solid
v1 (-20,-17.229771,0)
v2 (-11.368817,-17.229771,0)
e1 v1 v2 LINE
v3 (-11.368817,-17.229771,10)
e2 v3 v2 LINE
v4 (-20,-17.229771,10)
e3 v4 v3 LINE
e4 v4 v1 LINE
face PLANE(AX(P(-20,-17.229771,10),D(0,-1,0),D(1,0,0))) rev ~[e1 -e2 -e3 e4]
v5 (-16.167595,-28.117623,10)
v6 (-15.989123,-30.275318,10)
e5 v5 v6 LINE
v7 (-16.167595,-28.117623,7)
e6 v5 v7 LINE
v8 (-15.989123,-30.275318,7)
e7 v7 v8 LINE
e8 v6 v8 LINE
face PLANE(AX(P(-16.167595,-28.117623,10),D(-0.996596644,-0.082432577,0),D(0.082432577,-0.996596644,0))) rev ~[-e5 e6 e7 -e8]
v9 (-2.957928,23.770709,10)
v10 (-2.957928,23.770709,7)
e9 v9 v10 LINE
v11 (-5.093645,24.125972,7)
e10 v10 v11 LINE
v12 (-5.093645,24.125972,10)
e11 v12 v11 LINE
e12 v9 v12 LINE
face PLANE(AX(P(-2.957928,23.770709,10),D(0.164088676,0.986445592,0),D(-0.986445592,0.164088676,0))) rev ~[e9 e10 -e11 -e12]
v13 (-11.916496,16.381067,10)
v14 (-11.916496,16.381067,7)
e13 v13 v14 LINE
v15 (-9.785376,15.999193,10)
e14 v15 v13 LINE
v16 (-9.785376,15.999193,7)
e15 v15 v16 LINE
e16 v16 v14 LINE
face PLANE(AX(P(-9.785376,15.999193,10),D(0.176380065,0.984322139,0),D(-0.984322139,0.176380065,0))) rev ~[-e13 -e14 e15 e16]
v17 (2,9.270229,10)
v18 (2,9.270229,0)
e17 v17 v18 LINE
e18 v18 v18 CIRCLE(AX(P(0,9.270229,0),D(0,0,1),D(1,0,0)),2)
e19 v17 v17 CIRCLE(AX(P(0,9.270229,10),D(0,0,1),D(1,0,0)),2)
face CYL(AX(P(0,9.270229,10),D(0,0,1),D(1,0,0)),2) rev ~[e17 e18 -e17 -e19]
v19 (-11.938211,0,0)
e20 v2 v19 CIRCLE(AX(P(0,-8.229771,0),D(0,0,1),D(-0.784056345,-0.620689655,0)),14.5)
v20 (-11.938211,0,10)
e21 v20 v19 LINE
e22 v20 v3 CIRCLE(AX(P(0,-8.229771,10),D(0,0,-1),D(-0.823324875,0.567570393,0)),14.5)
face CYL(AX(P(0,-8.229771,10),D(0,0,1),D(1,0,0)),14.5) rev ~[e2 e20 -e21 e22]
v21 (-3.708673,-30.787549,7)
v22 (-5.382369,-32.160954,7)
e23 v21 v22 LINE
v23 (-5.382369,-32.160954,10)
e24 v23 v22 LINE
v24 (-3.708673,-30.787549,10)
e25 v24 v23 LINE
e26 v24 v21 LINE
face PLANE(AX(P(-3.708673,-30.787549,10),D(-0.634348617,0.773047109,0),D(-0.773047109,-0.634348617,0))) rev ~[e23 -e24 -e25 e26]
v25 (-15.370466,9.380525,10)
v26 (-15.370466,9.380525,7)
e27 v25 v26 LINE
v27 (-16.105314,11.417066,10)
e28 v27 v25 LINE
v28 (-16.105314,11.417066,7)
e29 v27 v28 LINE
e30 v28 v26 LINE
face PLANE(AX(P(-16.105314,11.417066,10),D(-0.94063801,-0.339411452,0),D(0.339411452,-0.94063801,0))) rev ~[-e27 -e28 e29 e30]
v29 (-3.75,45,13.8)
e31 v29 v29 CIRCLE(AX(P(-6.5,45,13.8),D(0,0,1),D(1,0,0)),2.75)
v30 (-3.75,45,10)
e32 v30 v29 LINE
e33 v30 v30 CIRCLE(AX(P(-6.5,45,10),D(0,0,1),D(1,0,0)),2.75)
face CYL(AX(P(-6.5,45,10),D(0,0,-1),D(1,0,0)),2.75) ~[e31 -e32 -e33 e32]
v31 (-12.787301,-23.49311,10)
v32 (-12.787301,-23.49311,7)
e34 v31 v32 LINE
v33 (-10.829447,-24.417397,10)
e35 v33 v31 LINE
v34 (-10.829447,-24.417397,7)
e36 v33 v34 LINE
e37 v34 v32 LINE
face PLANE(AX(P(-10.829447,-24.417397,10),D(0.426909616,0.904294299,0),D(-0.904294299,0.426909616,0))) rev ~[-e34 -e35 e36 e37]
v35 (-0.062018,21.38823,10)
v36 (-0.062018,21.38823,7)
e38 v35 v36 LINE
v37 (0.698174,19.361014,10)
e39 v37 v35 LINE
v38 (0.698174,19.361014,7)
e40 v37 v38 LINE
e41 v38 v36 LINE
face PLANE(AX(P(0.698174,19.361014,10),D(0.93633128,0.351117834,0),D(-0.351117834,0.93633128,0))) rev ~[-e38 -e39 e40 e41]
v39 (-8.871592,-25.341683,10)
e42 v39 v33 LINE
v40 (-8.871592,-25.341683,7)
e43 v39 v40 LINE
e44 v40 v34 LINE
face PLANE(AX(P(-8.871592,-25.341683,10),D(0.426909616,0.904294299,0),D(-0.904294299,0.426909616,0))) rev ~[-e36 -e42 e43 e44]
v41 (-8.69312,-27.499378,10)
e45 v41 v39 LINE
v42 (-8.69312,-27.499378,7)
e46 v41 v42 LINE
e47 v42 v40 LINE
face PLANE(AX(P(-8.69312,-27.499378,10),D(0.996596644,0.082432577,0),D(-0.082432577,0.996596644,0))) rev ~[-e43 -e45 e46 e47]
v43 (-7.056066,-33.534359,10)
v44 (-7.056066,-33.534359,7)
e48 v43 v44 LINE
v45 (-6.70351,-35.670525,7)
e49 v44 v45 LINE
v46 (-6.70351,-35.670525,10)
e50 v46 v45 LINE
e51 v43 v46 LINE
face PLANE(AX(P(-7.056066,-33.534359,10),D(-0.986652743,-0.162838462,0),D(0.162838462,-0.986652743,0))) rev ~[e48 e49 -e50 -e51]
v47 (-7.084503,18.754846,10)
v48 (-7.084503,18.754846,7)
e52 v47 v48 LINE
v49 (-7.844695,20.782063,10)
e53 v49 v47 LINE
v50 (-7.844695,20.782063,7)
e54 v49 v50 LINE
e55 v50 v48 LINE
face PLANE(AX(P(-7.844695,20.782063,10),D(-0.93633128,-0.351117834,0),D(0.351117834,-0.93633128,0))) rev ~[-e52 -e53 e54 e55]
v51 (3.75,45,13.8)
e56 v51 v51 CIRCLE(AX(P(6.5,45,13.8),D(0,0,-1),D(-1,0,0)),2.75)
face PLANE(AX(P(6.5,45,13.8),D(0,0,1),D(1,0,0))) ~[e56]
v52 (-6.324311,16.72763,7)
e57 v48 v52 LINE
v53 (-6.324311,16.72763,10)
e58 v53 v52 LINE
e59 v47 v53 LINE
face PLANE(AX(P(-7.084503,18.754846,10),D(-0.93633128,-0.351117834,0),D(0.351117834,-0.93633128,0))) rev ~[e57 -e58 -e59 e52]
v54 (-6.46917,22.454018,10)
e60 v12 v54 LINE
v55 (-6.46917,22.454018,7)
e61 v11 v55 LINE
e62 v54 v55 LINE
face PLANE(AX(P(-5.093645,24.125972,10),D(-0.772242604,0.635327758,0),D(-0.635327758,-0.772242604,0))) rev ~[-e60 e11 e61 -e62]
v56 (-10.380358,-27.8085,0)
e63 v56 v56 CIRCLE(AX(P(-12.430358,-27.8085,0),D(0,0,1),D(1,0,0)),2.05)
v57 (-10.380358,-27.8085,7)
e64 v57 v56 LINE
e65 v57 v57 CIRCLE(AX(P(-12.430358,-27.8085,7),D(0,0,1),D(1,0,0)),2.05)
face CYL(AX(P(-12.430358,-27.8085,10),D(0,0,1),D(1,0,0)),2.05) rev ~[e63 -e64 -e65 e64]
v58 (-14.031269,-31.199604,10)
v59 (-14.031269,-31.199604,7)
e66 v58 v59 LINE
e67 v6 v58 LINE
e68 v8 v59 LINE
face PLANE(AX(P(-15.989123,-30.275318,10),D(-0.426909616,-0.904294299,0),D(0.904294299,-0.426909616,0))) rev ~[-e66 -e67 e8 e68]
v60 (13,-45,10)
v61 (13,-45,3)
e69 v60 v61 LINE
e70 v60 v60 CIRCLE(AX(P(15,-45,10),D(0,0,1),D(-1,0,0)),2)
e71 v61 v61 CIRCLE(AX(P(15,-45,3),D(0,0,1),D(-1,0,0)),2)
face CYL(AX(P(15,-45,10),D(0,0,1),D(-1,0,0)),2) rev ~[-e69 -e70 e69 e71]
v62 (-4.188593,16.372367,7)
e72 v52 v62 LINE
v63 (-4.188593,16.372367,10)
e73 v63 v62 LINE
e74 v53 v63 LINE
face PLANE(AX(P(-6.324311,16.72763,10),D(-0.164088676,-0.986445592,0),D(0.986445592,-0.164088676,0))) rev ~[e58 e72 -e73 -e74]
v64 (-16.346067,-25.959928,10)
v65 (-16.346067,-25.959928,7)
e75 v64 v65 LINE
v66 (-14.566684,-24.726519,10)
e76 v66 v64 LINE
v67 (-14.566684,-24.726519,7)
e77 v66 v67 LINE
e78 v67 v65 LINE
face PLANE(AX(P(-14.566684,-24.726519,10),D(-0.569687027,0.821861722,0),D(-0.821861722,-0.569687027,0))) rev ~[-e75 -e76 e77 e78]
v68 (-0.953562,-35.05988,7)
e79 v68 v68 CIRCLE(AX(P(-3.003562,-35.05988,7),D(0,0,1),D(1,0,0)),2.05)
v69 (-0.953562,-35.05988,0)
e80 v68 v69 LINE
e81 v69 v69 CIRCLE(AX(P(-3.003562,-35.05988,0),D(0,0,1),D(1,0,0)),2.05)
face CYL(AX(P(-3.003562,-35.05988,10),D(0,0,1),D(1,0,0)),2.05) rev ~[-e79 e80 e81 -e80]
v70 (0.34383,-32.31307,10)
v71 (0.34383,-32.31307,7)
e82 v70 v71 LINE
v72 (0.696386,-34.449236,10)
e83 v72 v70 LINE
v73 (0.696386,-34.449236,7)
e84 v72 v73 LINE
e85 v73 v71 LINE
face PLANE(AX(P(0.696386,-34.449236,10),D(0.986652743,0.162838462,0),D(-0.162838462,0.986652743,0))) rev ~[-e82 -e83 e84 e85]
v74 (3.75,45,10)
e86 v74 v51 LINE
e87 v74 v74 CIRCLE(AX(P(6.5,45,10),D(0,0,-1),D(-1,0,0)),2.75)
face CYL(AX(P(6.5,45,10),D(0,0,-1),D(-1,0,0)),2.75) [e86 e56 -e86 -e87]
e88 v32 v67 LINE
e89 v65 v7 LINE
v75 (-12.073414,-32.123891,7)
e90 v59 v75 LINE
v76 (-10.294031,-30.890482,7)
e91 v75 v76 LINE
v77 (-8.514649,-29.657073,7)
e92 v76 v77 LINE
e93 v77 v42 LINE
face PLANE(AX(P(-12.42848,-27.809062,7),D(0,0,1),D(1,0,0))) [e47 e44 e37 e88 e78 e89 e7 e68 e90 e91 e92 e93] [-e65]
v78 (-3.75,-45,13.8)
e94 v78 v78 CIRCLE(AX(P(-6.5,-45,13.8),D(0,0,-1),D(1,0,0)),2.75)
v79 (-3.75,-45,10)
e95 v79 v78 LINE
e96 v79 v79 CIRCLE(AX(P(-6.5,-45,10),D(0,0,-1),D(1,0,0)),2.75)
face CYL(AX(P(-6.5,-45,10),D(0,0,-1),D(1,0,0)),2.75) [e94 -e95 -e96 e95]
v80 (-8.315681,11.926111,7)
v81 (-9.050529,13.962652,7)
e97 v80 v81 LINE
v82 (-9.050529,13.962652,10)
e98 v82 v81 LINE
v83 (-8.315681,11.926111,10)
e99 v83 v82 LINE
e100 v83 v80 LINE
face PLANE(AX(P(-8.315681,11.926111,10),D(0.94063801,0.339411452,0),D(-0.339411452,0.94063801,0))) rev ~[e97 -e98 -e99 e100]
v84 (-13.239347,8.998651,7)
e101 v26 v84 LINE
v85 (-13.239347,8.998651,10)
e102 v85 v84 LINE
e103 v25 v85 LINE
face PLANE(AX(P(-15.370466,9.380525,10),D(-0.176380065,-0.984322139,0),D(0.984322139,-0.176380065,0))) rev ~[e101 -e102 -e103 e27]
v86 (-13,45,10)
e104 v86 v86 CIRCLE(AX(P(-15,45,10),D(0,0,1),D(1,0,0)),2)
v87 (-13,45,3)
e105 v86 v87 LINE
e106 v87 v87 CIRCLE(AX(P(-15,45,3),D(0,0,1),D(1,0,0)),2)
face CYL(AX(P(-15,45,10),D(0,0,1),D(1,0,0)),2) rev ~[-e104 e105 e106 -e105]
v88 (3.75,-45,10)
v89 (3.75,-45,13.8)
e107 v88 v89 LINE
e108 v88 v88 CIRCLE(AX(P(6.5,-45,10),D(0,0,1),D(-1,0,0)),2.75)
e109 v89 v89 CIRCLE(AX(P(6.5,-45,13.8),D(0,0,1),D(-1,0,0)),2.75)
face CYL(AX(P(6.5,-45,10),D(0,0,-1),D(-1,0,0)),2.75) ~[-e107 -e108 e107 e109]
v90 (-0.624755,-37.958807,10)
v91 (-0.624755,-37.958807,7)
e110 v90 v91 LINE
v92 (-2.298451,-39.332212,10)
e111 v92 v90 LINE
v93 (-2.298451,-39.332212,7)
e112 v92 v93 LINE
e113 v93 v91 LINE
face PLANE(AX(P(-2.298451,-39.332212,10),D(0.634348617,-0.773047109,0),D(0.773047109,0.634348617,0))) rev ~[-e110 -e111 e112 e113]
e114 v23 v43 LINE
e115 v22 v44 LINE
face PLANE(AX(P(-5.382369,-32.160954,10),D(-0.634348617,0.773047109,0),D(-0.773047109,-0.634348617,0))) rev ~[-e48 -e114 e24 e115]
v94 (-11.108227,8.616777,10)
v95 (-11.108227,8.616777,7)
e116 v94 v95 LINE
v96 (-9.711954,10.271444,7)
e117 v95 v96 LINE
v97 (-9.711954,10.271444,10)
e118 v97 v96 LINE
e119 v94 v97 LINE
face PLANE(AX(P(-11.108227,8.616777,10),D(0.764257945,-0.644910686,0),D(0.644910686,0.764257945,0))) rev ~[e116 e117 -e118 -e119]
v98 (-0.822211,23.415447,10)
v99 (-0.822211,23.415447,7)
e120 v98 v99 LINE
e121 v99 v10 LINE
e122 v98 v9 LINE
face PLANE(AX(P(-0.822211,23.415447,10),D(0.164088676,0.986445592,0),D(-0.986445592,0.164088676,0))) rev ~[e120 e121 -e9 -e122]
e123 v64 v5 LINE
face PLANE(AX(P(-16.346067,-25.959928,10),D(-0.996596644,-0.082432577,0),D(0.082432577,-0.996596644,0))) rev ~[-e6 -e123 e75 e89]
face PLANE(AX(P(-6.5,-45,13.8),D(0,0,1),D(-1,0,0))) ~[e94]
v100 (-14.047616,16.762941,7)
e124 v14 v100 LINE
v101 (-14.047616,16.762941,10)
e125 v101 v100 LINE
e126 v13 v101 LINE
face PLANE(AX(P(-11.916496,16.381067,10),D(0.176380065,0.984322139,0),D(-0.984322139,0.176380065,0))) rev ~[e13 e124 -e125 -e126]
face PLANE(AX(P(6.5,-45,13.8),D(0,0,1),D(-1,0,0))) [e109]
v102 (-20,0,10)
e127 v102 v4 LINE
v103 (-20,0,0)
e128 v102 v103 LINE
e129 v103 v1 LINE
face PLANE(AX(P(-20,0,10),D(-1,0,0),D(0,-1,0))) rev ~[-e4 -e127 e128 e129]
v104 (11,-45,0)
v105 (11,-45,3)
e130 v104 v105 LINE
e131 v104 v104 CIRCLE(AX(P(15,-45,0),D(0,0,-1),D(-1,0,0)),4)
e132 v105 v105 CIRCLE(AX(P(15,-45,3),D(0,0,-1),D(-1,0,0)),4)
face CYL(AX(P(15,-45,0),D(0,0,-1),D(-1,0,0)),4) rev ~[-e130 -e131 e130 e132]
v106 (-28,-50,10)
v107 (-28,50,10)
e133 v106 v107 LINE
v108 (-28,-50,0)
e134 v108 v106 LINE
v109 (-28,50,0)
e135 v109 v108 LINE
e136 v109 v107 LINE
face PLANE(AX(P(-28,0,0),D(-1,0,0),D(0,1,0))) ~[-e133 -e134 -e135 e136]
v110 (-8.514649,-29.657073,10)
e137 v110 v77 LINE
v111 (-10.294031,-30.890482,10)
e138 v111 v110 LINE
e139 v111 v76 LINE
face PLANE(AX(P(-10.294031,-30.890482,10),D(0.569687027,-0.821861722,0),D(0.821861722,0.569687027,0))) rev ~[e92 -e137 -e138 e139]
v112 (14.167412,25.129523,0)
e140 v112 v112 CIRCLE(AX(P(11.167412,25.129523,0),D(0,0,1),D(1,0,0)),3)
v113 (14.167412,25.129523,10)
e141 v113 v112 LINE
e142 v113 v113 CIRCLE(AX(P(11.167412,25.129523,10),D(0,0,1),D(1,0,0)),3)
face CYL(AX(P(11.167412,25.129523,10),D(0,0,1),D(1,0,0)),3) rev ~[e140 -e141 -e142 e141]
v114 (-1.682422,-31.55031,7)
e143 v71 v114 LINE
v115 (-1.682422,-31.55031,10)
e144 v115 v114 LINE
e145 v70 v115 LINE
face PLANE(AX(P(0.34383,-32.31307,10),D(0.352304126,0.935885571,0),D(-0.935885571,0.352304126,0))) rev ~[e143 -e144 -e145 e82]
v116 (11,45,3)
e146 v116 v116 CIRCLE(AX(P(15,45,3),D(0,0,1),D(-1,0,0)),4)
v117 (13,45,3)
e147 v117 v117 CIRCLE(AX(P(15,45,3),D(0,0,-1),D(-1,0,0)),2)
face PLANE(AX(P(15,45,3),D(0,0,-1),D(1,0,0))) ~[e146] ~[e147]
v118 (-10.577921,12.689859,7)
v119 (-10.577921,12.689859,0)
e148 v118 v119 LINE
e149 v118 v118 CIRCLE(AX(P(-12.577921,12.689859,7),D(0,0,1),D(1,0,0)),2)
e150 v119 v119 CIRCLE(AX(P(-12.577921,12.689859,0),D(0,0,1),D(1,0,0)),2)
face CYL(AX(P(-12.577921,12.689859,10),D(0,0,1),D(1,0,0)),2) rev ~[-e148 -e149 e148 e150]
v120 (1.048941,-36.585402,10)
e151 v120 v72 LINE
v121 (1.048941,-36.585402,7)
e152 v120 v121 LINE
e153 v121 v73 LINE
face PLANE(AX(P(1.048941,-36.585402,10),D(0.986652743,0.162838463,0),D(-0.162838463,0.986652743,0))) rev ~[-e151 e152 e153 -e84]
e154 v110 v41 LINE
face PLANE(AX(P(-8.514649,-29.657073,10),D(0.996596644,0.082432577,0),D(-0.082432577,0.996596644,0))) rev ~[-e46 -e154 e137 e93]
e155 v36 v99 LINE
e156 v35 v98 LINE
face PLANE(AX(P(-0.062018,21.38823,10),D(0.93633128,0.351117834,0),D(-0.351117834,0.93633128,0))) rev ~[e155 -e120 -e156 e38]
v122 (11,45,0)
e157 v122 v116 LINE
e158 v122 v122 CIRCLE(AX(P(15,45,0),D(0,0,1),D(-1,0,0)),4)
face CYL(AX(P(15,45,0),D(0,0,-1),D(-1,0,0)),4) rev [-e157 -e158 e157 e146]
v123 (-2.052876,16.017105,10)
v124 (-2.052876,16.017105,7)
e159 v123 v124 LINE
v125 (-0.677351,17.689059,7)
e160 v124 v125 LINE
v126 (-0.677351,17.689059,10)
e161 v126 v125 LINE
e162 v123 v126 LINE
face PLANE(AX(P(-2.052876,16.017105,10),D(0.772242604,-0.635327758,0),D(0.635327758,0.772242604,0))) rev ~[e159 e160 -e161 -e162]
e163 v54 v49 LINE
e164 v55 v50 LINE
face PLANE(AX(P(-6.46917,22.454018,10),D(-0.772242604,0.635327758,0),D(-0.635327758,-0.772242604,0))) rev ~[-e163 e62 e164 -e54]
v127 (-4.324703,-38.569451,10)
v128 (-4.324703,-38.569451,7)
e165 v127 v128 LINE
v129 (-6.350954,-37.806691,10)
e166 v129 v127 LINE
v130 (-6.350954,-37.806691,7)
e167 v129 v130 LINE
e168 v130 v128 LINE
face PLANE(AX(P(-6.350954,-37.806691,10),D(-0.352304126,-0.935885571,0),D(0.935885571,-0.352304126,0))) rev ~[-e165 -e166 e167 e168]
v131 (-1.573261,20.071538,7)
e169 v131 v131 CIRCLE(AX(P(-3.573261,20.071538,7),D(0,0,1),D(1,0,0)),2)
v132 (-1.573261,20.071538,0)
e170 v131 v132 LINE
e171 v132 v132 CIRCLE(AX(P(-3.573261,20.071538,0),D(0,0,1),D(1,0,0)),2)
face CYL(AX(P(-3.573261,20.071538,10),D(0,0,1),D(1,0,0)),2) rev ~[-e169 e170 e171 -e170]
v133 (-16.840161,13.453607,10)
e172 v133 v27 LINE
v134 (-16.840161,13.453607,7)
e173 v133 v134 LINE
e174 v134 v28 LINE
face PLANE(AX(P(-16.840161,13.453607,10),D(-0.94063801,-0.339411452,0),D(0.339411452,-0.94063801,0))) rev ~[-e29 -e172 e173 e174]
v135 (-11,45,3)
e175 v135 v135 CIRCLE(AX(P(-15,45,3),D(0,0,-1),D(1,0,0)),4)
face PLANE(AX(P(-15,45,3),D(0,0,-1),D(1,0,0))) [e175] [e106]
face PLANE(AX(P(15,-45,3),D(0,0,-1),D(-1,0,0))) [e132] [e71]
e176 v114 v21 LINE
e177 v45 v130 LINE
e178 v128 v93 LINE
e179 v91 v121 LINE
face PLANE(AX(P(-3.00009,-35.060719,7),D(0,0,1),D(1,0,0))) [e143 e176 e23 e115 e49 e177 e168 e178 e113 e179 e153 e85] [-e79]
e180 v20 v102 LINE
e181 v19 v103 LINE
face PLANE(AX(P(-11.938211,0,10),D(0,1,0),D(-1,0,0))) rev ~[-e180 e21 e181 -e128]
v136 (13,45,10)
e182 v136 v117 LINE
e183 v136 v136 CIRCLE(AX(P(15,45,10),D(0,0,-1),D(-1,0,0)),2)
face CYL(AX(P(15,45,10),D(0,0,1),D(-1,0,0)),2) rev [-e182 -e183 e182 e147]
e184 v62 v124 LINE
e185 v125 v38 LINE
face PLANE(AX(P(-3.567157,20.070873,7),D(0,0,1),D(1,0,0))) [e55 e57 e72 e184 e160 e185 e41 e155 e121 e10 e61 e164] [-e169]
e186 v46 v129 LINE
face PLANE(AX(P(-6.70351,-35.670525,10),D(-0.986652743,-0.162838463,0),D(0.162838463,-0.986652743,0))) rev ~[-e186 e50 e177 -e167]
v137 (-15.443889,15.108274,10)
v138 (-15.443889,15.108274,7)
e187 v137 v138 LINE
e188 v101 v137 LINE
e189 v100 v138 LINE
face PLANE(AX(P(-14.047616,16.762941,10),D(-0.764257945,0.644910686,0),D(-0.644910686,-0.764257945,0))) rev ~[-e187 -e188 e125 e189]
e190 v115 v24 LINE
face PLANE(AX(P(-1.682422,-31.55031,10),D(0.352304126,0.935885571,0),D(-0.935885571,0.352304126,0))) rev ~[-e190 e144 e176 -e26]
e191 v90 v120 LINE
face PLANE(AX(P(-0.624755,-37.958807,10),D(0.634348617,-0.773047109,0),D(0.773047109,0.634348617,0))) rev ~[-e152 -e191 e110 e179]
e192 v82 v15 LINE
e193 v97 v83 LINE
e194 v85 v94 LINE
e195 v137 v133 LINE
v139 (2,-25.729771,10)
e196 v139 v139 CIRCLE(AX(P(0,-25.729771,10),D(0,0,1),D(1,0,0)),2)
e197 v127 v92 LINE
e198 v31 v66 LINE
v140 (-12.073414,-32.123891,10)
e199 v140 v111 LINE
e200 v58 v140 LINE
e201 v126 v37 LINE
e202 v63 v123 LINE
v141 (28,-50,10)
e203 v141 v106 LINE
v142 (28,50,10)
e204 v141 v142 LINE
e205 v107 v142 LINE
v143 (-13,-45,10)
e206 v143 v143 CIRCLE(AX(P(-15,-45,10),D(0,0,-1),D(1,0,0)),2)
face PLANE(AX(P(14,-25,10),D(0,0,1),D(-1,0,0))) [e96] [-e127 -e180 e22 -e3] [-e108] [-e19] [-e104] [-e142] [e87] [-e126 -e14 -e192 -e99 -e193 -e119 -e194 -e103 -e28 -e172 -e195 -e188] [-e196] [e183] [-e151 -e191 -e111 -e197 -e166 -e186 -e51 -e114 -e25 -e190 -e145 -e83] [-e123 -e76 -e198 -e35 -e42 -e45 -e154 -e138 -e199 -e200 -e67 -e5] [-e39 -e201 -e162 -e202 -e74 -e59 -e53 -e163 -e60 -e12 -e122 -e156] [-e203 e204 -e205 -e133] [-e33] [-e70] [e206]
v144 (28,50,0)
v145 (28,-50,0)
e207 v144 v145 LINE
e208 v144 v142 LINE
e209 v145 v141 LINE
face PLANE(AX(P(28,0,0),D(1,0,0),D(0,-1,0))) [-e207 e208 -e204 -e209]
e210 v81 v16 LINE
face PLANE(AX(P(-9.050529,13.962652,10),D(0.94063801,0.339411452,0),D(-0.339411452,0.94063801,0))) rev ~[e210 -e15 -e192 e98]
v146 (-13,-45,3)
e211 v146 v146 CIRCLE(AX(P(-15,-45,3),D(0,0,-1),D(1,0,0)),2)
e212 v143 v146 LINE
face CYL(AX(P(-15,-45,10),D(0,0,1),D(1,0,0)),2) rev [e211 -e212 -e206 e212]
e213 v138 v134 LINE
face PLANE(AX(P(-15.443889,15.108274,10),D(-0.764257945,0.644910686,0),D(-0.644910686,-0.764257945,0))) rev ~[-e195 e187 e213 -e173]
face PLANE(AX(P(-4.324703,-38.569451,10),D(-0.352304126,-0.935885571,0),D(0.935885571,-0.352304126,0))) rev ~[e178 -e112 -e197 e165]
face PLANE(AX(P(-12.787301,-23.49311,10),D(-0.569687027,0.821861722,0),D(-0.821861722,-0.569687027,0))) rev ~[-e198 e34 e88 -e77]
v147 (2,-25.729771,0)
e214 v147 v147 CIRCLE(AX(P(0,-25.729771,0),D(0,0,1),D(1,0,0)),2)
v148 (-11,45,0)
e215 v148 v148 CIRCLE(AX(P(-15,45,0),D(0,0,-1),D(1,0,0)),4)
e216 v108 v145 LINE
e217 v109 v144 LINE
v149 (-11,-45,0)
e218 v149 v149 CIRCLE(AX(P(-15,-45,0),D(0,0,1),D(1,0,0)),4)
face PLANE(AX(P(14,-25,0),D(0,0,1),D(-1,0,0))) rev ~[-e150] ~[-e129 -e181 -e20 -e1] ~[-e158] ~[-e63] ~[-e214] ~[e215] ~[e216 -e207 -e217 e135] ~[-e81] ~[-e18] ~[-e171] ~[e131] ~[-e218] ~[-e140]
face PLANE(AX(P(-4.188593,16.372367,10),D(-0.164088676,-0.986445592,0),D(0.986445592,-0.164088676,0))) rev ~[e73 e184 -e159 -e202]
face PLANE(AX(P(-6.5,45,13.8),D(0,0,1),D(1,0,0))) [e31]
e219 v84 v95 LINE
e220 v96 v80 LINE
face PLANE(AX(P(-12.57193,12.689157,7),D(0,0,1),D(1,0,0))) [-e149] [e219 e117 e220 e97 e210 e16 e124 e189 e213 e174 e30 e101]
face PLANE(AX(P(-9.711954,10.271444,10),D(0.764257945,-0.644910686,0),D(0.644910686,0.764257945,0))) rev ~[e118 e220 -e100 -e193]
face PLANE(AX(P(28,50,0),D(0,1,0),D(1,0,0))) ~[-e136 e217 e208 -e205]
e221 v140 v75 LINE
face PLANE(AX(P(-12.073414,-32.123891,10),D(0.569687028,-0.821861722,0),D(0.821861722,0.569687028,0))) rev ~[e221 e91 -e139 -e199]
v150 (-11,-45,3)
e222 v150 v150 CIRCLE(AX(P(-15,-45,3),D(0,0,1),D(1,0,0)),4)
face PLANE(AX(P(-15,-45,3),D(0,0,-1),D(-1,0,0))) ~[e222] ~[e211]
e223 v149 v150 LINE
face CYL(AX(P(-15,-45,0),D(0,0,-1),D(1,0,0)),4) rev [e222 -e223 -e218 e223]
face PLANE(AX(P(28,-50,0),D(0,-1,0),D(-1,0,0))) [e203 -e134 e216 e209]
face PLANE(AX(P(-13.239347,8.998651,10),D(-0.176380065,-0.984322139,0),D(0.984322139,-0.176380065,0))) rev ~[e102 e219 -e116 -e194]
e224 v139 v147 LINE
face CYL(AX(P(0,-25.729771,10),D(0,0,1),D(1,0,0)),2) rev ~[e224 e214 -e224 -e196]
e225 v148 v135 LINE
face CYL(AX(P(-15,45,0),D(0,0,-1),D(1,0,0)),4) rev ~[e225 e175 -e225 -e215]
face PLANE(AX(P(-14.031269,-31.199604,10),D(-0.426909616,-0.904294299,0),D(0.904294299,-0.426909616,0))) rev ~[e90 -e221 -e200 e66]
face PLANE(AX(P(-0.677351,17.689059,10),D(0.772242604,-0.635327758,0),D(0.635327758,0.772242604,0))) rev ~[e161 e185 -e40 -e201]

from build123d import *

# Parameters (mm, degrees)
F0_W      = 28
F0_H      = 50
F1_DEPTH  = 10
F3_DEPTH  = 10.001
F5_DEPTH  = 3.8
F6_R      = 4
F7_DEPTH  = 3
F10_R     = 2.05
F10_R_2   = 14.5
F11_DEPTH = 10.001
F12_R     = 2
F13_DEPTH = 10.001
F15_DEPTH = 10.001
F16_R     = 2
F16_R_2   = 2.9
F17_DEPTH = 25
F19_DEPTH = 3
F20_R     = 5.554436341
F21_DEPTH = 10
F22_R     = 3
F23_DEPTH = 25


with BuildPart() as f1:
    # F0 (on Top) → F1 (new body)
    with BuildSketch(Plane.XY):
        with Locations((-14, 25)):
            Rectangle(F0_W, F0_H)
    extrude(amount=F1_DEPTH)

    # F2 (on face) → F3 (cut, through all)
    with BuildSketch(Plane.XY.offset(10)):
        with BuildLine():
            ThreePointArc((-17, 45), (-15, 43), (-13, 45))
            Line((-13, 45), (-17, 45))
        make_face()
        with BuildLine():
            Line((-17, 45), (-13, 45))
            ThreePointArc((-13, 45), (-15, 47), (-17, 45))
        make_face()
    extrude(amount=-F3_DEPTH, mode=Mode.SUBTRACT)

    # F4 (on face) → F5 (join)
    with BuildSketch(Plane.XY.offset(10)):
        with BuildLine():
            ThreePointArc((-9.25, 45), (-6.5, 42.25), (-3.75, 45))
            ThreePointArc((-3.75, 45), (-6.5, 47.75), (-9.25, 45))
        make_face()
    extrude(amount=F5_DEPTH)

    # F6 (on face) → F7 (cut)
    with BuildSketch(Plane(origin=(0, 0, 0), x_dir=(1, 0, 0), z_dir=(0, 0, -1))):
        with Locations((-15, -45)):
            Circle(F6_R)
    extrude(amount=-F7_DEPTH, mode=Mode.SUBTRACT)

    # F8: F1 across plane


with BuildPart() as f1_1:
    add(f1.part)
    add(f1.part.mirror(Plane.XZ))

    # F9: F1 across plane


with BuildPart() as f1_2:
    add(f1_1.part)
    add(f1_1.part.mirror(Plane.YZ))

    # F10 (on face) → F11 (cut, through all)
    with BuildSketch(Plane.XY.offset(10)):
        with Locations((-12.4303577468, -27.8085004538)):
            Circle(F10_R)
        with Locations((-3.0035621021, -35.0598804653)):
            Circle(F10_R)
        with Locations((0, -8.2297706977)):
            Circle(F10_R_2)
    extrude(amount=-F11_DEPTH, mode=Mode.SUBTRACT)

    # F12 (on face) → F13 (cut, through all)
    with BuildSketch(Plane.XY.offset(10)):
        with Locations((0, -25.7297706977)):
            Circle(F12_R)
        with Locations((0, 9.2702293023)):
            Circle(F12_R)
    extrude(amount=-F13_DEPTH, mode=Mode.SUBTRACT)

    # F14 (on face) → F15 (cut, through all)
    with BuildSketch(Plane.XY.offset(10)):
        with BuildLine():
            Line((-20, -17.2297706977), (-11.3688170009, -17.2297706977))
            ThreePointArc((-11.3688170009, -17.2297706977), (-14.4920886836, -8.7086919702), (-11.938210681, 0))
            Line((-11.938210681, 0), (-20, 0))
            Line((-20, 0), (-20, -17.2297706977))
        make_face()
    extrude(amount=-F15_DEPTH, mode=Mode.SUBTRACT)

    # F16 (on face) → F17 (cut)
    with BuildSketch(Plane.XY.offset(10)):
        with Locations((-12.577921219, 12.6898593464)):
            Circle(F16_R)
        with Locations((-3.5732606182, 20.0715383219)):
            Circle(F16_R)
        with Locations((-11.7482841015, 30.8276228607)):
            Circle(F16_R_2)
    extrude(amount=-F17_DEPTH, mode=Mode.SUBTRACT)

    # F18 (on face) → F19 (cut)
    with BuildSketch(Plane.XY.offset(10)):
        with BuildLine():
            ThreePointArc((-10.2940314446, -30.890481948), (-9.1081804763, -29.5479366221), (-8.6803577468, -27.8085004538))
            ThreePointArc((-8.6803577468, -27.8085004538), (-8.683549751, -27.6538077178), (-8.6931203295, -27.499378331))
            ThreePointArc((-8.6931203295, -27.499378331), (-9.348376277, -25.6721741164), (-10.8294466879, -24.4173968309))
            ThreePointArc((-10.8294466879, -24.4173968309), (-12.7394799346, -24.0712630419), (-14.5666841389, -24.726519022))
            ThreePointArc((-14.5666841389, -24.726519022), (-15.8214613903, -26.2075894384), (-16.1675951564, -28.1176226698))
            ThreePointArc((-16.1675951564, -28.1176226698), (-15.51233919, -29.9448268296), (-14.0312688057, -31.1996040768))
            ThreePointArc((-14.0312688057, -31.1996040768), (-12.1212356135, -31.5457378703), (-10.2940314446, -30.890481948))
        make_face()
        with BuildLine():
            ThreePointArc((-8.6931203295, -27.499378331), (-8.683549751, -27.6538077178), (-8.6803577468, -27.8085004538))
            ThreePointArc((-8.6803577468, -27.8085004538), (-9.1081804763, -29.5479366221), (-10.2940314446, -30.890481948))
            Line((-10.2940314446, -30.890481948), (-8.5146485687, -29.6570733177))
            Line((-8.5146485687, -29.6570733177), (-8.6931203295, -27.499378331))
        make_face()
        with BuildLine():
            ThreePointArc((-10.8294466879, -24.4173968309), (-9.348376277, -25.6721741164), (-8.6931203295, -27.499378331))
            Line((-8.6931203295, -27.499378331), (-8.8715920969, -25.3416832638))
            Line((-8.8715920969, -25.3416832638), (-10.8294466879, -24.4173968309))
        make_face()
        with BuildLine():
            Line((-12.0734142186, -32.1238905078), (-10.2940314446, -30.890481948))
            ThreePointArc((-10.2940314446, -30.890481948), (-12.1212356135, -31.5457378703), (-14.0312688057, -31.1996040768))
            Line((-14.0312688057, -31.1996040768), (-12.0734142186, -32.1238905078))
        make_face()
        with BuildLine():
            ThreePointArc((-14.5666841389, -24.726519022), (-12.7394799346, -24.0712630419), (-10.8294466879, -24.4173968309))
            Line((-10.8294466879, -24.4173968309), (-12.7873012749, -23.4931103999))
            Line((-12.7873012749, -23.4931103999), (-14.5666841389, -24.726519022))
        make_face()
        with BuildLine():
            Line((-15.9891233967, -30.2753176439), (-14.0312688057, -31.1996040768))
            ThreePointArc((-14.0312688057, -31.1996040768), (-15.51233919, -29.9448268296), (-16.1675951564, -28.1176226698))
            Line((-16.1675951564, -28.1176226698), (-15.9891233967, -30.2753176439))
        make_face()
        with BuildLine():
            ThreePointArc((-16.1675951564, -28.1176226698), (-15.8214613903, -26.2075894384), (-14.5666841389, -24.726519022))
            Line((-14.5666841389, -24.726519022), (-16.3460669248, -25.95992759))
            Line((-16.3460669248, -25.95992759), (-16.1675951564, -28.1176226698))
        make_face()
        with BuildLine():
            ThreePointArc((-0.6247549112, -37.9588072233), (0.3863513899, -36.6633100761), (0.7464378979, -35.0598804653))
            ThreePointArc((0.7464378979, -35.0598804653), (0.733903899, -34.7535344349), (0.6963856897, -34.4492362663))
            ThreePointArc((0.6963856897, -34.4492362663), (-0.1046354718, -32.6810731187), (-1.6824217444, -31.5503095292))
            ThreePointArc((-1.6824217444, -31.5503095292), (-3.6142063621, -31.3599326835), (-5.3823693594, -32.1609537617))
            ThreePointArc((-5.3823693594, -32.1609537617), (-6.5131330001, -33.7387400064), (-6.7035098714, -35.6705248009))
            ThreePointArc((-6.7035098714, -35.6705248009), (-5.9024888018, -37.4386877272), (-4.3247027942, -38.5694512755))
            ThreePointArc((-4.3247027942, -38.5694512755), (-2.3929180607, -38.7598282831), (-0.6247549112, -37.9588072233))
        make_face()
        with BuildLine():
            ThreePointArc((0.6963856897, -34.4492362663), (0.733903899, -34.7535344349), (0.7464378979, -35.0598804653))
            ThreePointArc((0.7464378979, -35.0598804653), (0.3863513899, -36.6633100761), (-0.6247549112, -37.9588072233))
            Line((-0.6247549112, -37.9588072233), (1.048941297, -36.5854020812))
            Line((1.048941297, -36.5854020812), (0.6963856897, -34.4492362663))
        make_face()
        with BuildLine():
            ThreePointArc((-1.6824217444, -31.5503095292), (-0.1046354718, -32.6810731187), (0.6963856897, -34.4492362663))
            Line((0.6963856897, -34.4492362663), (0.3438300708, -32.3130703807))
            Line((0.3438300708, -32.3130703807), (-1.6824217444, -31.5503095292))
        make_face()
        with BuildLine():
            Line((-2.298450876, -39.3322121657), (-0.6247549112, -37.9588072233))
            ThreePointArc((-0.6247549112, -37.9588072233), (-2.3929180607, -38.7598282831), (-4.3247027942, -38.5694512755))
            Line((-4.3247027942, -38.5694512755), (-2.298450876, -39.3322121657))
        make_face()
        with BuildLine():
            ThreePointArc((-5.3823693594, -32.1609537617), (-3.6142063621, -31.3599326835), (-1.6824217444, -31.5503095292))
            Line((-1.6824217444, -31.5503095292), (-3.7086733282, -30.7875487648))
            Line((-3.7086733282, -30.7875487648), (-5.3823693594, -32.1609537617))
        make_face()
        with BuildLine():
            Line((-6.350954275, -37.8066905498), (-4.3247027942, -38.5694512755))
            ThreePointArc((-4.3247027942, -38.5694512755), (-5.9024888018, -37.4386877272), (-6.7035098714, -35.6705248009))
            Line((-6.7035098714, -35.6705248009), (-6.350954275, -37.8066905498))
        make_face()
        with BuildLine():
            ThreePointArc((-6.7035098714, -35.6705248009), (-6.5131330001, -33.7387400064), (-5.3823693594, -32.1609537617))
            Line((-5.3823693594, -32.1609537617), (-7.0560655012, -33.5343588494))
            Line((-7.0560655012, -33.5343588494), (-6.7035098714, -35.6705248009))
        make_face()
        with BuildLine():
            ThreePointArc((-9.7119539354, 10.2714442602), (-9.0558566744, 11.4023962039), (-8.827921219, 12.6898593464))
            ThreePointArc((-8.827921219, 12.6898593464), (-8.8839922837, 13.3359158612), (-9.0505286965, 13.9626523351))
            ThreePointArc((-9.0505286965, 13.9626523351), (-10.1595061384, 15.5558266347), (-11.9164959132, 16.3810673553))
            ThreePointArc((-11.9164959132, 16.3810673553), (-13.8507141383, 16.2172518939), (-15.4438885169, 15.1082744157))
            ThreePointArc((-15.4438885169, 15.1082744157), (-16.269129236, 13.3512846071), (-16.1053137706, 11.4170664382))
            ThreePointArc((-16.1053137706, 11.4170664382), (-14.9963363324, 9.8238920856), (-13.2393465249, 8.9986513375))
            ThreePointArc((-13.2393465249, 8.9986513375), (-11.3051283101, 9.1624667951), (-9.7119539354, 10.2714442602))
        make_face()
        with BuildLine():
            ThreePointArc((-9.0505286965, 13.9626523351), (-8.8839922837, 13.3359158612), (-8.827921219, 12.6898593464))
            ThreePointArc((-8.827921219, 12.6898593464), (-9.0558566744, 11.4023962039), (-9.7119539354, 10.2714442602))
            Line((-9.7119539354, 10.2714442602), (-8.3156813312, 11.9261112606))
            Line((-8.3156813312, 11.9261112606), (-9.0505286965, 13.9626523351))
        make_face()
        with BuildLine():
            ThreePointArc((-11.9164959132, 16.3810673553), (-10.1595061384, 15.5558266347), (-9.0505286965, 13.9626523351))
            Line((-9.0505286965, 13.9626523351), (-9.7853760307, 15.9991933234))
            Line((-9.7853760307, 15.9991933234), (-11.9164959132, 16.3810673553))
        make_face()
        with BuildLine():
            Line((-11.1082265195, 8.6167772836), (-9.7119539354, 10.2714442602))
            ThreePointArc((-9.7119539354, 10.2714442602), (-11.3051283101, 9.1624667951), (-13.2393465249, 8.9986513375))
            Line((-13.2393465249, 8.9986513375), (-11.1082265195, 8.6167772836))
        make_face()
        with BuildLine():
            ThreePointArc((-15.4438885169, 15.1082744157), (-13.8507141383, 16.2172518939), (-11.9164959132, 16.3810673553))
            Line((-11.9164959132, 16.3810673553), (-14.0476159186, 16.7629414092))
            Line((-14.0476159186, 16.7629414092), (-15.4438885169, 15.1082744157))
        make_face()
        with BuildLine():
            Line((-15.3704664073, 9.3805253694), (-13.2393465249, 8.9986513375))
            ThreePointArc((-13.2393465249, 8.9986513375), (-14.9963363324, 9.8238920856), (-16.1053137706, 11.4170664382))
            Line((-16.1053137706, 11.4170664382), (-15.3704664073, 9.3805253694))
        make_face()
        with BuildLine():
            ThreePointArc((-16.1053137706, 11.4170664382), (-16.269129236, 13.3512846071), (-15.4438885169, 15.1082744157))
            Line((-15.4438885169, 15.1082744157), (-16.8401611069, 13.4536074322))
            Line((-16.8401611069, 13.4536074322), (-16.1053137706, 11.4170664382))
        make_face()
        with BuildLine():
            ThreePointArc((-0.6773508715, 17.6890592058), (-0.0432350127, 18.8060663843), (0.1767393818, 20.0715383219))
            ThreePointArc((0.1767393818, 20.0715383219), (0.1165671942, 20.7406203163), (-0.0620183329, 21.3882302427))
            ThreePointArc((-0.0620183329, 21.3882302427), (-1.1907815138, 22.9674480783), (-2.957928008, 23.7707092802))
            ThreePointArc((-2.957928008, 23.7707092802), (-4.8899524085, 23.5827806561), (-6.4691703134, 22.4540175007))
            ThreePointArc((-6.4691703134, 22.4540175007), (-7.2724315792, 20.6868709158), (-7.084502922, 18.7548464508))
            ThreePointArc((-7.084502922, 18.7548464508), (-5.955739677, 17.1756285281), (-4.1885930596, 16.3723673355))
            ThreePointArc((-4.1885930596, 16.3723673355), (-2.2565687098, 16.560296032), (-0.6773508715, 17.6890592058))
        make_face()
        with BuildLine():
            ThreePointArc((-0.0620183329, 21.3882302427), (0.1165671942, 20.7406203163), (0.1767393818, 20.0715383219))
            ThreePointArc((0.1767393818, 20.0715383219), (-0.0432350127, 18.8060663843), (-0.6773508715, 17.6890592058))
            Line((-0.6773508715, 17.6890592058), (0.6981740932, 19.3610135117))
            Line((0.6981740932, 19.3610135117), (-0.0620183329, 21.3882302427))
        make_face()
        with BuildLine():
            ThreePointArc((-2.957928008, 23.7707092802), (-1.1907815138, 22.9674480783), (-0.0620183329, 21.3882302427))
            Line((-0.0620183329, 21.3882302427), (-0.8222107268, 23.4154468875))
            Line((-0.8222107268, 23.4154468875), (-2.957928008, 23.7707092802))
        make_face()
        with BuildLine():
            Line((-2.0528757981, 16.0171049461), (-0.6773508715, 17.6890592058))
            ThreePointArc((-0.6773508715, 17.6890592058), (-2.2565687098, 16.560296032), (-4.1885930596, 16.3723673355))
            Line((-4.1885930596, 16.3723673355), (-2.0528757981, 16.0171049461))
        make_face()
        with BuildLine():
            ThreePointArc((-6.4691703134, 22.4540175007), (-4.8899524085, 23.5827806561), (-2.957928008, 23.7707092802))
            Line((-2.957928008, 23.7707092802), (-5.0936454382, 24.1259716978))
            Line((-5.0936454382, 24.1259716978), (-6.4691703134, 22.4540175007))
        make_face()
        with BuildLine():
            Line((-6.3243105096, 16.7276297563), (-4.1885930596, 16.3723673355))
            ThreePointArc((-4.1885930596, 16.3723673355), (-5.955739677, 17.1756285281), (-7.084502922, 18.7548464508))
            Line((-7.084502922, 18.7548464508), (-6.3243105096, 16.7276297563))
        make_face()
        with BuildLine():
            ThreePointArc((-7.084502922, 18.7548464508), (-7.2724315792, 20.6868709158), (-6.4691703134, 22.4540175007))
            Line((-6.4691703134, 22.4540175007), (-7.8446953296, 20.7820631322))
            Line((-7.8446953296, 20.7820631322), (-7.084502922, 18.7548464508))
        make_face()
    extrude(amount=-F19_DEPTH, mode=Mode.SUBTRACT)

    # F20 (on face) → F21 (join)
    with BuildSketch(Plane.XY.offset(10)):
        with Locations((-11.7482841015, 30.8276228607)):
            Circle(F20_R)
    extrude(amount=-F21_DEPTH)

    # F22 (on face) → F23 (cut)
    with BuildSketch(Plane.XY.offset(10)):
        with Locations((11.1674116924, 25.1295231283)):
            Circle(F22_R)
    extrude(amount=-F23_DEPTH, mode=Mode.SUBTRACT)


solid = f1_2.part
